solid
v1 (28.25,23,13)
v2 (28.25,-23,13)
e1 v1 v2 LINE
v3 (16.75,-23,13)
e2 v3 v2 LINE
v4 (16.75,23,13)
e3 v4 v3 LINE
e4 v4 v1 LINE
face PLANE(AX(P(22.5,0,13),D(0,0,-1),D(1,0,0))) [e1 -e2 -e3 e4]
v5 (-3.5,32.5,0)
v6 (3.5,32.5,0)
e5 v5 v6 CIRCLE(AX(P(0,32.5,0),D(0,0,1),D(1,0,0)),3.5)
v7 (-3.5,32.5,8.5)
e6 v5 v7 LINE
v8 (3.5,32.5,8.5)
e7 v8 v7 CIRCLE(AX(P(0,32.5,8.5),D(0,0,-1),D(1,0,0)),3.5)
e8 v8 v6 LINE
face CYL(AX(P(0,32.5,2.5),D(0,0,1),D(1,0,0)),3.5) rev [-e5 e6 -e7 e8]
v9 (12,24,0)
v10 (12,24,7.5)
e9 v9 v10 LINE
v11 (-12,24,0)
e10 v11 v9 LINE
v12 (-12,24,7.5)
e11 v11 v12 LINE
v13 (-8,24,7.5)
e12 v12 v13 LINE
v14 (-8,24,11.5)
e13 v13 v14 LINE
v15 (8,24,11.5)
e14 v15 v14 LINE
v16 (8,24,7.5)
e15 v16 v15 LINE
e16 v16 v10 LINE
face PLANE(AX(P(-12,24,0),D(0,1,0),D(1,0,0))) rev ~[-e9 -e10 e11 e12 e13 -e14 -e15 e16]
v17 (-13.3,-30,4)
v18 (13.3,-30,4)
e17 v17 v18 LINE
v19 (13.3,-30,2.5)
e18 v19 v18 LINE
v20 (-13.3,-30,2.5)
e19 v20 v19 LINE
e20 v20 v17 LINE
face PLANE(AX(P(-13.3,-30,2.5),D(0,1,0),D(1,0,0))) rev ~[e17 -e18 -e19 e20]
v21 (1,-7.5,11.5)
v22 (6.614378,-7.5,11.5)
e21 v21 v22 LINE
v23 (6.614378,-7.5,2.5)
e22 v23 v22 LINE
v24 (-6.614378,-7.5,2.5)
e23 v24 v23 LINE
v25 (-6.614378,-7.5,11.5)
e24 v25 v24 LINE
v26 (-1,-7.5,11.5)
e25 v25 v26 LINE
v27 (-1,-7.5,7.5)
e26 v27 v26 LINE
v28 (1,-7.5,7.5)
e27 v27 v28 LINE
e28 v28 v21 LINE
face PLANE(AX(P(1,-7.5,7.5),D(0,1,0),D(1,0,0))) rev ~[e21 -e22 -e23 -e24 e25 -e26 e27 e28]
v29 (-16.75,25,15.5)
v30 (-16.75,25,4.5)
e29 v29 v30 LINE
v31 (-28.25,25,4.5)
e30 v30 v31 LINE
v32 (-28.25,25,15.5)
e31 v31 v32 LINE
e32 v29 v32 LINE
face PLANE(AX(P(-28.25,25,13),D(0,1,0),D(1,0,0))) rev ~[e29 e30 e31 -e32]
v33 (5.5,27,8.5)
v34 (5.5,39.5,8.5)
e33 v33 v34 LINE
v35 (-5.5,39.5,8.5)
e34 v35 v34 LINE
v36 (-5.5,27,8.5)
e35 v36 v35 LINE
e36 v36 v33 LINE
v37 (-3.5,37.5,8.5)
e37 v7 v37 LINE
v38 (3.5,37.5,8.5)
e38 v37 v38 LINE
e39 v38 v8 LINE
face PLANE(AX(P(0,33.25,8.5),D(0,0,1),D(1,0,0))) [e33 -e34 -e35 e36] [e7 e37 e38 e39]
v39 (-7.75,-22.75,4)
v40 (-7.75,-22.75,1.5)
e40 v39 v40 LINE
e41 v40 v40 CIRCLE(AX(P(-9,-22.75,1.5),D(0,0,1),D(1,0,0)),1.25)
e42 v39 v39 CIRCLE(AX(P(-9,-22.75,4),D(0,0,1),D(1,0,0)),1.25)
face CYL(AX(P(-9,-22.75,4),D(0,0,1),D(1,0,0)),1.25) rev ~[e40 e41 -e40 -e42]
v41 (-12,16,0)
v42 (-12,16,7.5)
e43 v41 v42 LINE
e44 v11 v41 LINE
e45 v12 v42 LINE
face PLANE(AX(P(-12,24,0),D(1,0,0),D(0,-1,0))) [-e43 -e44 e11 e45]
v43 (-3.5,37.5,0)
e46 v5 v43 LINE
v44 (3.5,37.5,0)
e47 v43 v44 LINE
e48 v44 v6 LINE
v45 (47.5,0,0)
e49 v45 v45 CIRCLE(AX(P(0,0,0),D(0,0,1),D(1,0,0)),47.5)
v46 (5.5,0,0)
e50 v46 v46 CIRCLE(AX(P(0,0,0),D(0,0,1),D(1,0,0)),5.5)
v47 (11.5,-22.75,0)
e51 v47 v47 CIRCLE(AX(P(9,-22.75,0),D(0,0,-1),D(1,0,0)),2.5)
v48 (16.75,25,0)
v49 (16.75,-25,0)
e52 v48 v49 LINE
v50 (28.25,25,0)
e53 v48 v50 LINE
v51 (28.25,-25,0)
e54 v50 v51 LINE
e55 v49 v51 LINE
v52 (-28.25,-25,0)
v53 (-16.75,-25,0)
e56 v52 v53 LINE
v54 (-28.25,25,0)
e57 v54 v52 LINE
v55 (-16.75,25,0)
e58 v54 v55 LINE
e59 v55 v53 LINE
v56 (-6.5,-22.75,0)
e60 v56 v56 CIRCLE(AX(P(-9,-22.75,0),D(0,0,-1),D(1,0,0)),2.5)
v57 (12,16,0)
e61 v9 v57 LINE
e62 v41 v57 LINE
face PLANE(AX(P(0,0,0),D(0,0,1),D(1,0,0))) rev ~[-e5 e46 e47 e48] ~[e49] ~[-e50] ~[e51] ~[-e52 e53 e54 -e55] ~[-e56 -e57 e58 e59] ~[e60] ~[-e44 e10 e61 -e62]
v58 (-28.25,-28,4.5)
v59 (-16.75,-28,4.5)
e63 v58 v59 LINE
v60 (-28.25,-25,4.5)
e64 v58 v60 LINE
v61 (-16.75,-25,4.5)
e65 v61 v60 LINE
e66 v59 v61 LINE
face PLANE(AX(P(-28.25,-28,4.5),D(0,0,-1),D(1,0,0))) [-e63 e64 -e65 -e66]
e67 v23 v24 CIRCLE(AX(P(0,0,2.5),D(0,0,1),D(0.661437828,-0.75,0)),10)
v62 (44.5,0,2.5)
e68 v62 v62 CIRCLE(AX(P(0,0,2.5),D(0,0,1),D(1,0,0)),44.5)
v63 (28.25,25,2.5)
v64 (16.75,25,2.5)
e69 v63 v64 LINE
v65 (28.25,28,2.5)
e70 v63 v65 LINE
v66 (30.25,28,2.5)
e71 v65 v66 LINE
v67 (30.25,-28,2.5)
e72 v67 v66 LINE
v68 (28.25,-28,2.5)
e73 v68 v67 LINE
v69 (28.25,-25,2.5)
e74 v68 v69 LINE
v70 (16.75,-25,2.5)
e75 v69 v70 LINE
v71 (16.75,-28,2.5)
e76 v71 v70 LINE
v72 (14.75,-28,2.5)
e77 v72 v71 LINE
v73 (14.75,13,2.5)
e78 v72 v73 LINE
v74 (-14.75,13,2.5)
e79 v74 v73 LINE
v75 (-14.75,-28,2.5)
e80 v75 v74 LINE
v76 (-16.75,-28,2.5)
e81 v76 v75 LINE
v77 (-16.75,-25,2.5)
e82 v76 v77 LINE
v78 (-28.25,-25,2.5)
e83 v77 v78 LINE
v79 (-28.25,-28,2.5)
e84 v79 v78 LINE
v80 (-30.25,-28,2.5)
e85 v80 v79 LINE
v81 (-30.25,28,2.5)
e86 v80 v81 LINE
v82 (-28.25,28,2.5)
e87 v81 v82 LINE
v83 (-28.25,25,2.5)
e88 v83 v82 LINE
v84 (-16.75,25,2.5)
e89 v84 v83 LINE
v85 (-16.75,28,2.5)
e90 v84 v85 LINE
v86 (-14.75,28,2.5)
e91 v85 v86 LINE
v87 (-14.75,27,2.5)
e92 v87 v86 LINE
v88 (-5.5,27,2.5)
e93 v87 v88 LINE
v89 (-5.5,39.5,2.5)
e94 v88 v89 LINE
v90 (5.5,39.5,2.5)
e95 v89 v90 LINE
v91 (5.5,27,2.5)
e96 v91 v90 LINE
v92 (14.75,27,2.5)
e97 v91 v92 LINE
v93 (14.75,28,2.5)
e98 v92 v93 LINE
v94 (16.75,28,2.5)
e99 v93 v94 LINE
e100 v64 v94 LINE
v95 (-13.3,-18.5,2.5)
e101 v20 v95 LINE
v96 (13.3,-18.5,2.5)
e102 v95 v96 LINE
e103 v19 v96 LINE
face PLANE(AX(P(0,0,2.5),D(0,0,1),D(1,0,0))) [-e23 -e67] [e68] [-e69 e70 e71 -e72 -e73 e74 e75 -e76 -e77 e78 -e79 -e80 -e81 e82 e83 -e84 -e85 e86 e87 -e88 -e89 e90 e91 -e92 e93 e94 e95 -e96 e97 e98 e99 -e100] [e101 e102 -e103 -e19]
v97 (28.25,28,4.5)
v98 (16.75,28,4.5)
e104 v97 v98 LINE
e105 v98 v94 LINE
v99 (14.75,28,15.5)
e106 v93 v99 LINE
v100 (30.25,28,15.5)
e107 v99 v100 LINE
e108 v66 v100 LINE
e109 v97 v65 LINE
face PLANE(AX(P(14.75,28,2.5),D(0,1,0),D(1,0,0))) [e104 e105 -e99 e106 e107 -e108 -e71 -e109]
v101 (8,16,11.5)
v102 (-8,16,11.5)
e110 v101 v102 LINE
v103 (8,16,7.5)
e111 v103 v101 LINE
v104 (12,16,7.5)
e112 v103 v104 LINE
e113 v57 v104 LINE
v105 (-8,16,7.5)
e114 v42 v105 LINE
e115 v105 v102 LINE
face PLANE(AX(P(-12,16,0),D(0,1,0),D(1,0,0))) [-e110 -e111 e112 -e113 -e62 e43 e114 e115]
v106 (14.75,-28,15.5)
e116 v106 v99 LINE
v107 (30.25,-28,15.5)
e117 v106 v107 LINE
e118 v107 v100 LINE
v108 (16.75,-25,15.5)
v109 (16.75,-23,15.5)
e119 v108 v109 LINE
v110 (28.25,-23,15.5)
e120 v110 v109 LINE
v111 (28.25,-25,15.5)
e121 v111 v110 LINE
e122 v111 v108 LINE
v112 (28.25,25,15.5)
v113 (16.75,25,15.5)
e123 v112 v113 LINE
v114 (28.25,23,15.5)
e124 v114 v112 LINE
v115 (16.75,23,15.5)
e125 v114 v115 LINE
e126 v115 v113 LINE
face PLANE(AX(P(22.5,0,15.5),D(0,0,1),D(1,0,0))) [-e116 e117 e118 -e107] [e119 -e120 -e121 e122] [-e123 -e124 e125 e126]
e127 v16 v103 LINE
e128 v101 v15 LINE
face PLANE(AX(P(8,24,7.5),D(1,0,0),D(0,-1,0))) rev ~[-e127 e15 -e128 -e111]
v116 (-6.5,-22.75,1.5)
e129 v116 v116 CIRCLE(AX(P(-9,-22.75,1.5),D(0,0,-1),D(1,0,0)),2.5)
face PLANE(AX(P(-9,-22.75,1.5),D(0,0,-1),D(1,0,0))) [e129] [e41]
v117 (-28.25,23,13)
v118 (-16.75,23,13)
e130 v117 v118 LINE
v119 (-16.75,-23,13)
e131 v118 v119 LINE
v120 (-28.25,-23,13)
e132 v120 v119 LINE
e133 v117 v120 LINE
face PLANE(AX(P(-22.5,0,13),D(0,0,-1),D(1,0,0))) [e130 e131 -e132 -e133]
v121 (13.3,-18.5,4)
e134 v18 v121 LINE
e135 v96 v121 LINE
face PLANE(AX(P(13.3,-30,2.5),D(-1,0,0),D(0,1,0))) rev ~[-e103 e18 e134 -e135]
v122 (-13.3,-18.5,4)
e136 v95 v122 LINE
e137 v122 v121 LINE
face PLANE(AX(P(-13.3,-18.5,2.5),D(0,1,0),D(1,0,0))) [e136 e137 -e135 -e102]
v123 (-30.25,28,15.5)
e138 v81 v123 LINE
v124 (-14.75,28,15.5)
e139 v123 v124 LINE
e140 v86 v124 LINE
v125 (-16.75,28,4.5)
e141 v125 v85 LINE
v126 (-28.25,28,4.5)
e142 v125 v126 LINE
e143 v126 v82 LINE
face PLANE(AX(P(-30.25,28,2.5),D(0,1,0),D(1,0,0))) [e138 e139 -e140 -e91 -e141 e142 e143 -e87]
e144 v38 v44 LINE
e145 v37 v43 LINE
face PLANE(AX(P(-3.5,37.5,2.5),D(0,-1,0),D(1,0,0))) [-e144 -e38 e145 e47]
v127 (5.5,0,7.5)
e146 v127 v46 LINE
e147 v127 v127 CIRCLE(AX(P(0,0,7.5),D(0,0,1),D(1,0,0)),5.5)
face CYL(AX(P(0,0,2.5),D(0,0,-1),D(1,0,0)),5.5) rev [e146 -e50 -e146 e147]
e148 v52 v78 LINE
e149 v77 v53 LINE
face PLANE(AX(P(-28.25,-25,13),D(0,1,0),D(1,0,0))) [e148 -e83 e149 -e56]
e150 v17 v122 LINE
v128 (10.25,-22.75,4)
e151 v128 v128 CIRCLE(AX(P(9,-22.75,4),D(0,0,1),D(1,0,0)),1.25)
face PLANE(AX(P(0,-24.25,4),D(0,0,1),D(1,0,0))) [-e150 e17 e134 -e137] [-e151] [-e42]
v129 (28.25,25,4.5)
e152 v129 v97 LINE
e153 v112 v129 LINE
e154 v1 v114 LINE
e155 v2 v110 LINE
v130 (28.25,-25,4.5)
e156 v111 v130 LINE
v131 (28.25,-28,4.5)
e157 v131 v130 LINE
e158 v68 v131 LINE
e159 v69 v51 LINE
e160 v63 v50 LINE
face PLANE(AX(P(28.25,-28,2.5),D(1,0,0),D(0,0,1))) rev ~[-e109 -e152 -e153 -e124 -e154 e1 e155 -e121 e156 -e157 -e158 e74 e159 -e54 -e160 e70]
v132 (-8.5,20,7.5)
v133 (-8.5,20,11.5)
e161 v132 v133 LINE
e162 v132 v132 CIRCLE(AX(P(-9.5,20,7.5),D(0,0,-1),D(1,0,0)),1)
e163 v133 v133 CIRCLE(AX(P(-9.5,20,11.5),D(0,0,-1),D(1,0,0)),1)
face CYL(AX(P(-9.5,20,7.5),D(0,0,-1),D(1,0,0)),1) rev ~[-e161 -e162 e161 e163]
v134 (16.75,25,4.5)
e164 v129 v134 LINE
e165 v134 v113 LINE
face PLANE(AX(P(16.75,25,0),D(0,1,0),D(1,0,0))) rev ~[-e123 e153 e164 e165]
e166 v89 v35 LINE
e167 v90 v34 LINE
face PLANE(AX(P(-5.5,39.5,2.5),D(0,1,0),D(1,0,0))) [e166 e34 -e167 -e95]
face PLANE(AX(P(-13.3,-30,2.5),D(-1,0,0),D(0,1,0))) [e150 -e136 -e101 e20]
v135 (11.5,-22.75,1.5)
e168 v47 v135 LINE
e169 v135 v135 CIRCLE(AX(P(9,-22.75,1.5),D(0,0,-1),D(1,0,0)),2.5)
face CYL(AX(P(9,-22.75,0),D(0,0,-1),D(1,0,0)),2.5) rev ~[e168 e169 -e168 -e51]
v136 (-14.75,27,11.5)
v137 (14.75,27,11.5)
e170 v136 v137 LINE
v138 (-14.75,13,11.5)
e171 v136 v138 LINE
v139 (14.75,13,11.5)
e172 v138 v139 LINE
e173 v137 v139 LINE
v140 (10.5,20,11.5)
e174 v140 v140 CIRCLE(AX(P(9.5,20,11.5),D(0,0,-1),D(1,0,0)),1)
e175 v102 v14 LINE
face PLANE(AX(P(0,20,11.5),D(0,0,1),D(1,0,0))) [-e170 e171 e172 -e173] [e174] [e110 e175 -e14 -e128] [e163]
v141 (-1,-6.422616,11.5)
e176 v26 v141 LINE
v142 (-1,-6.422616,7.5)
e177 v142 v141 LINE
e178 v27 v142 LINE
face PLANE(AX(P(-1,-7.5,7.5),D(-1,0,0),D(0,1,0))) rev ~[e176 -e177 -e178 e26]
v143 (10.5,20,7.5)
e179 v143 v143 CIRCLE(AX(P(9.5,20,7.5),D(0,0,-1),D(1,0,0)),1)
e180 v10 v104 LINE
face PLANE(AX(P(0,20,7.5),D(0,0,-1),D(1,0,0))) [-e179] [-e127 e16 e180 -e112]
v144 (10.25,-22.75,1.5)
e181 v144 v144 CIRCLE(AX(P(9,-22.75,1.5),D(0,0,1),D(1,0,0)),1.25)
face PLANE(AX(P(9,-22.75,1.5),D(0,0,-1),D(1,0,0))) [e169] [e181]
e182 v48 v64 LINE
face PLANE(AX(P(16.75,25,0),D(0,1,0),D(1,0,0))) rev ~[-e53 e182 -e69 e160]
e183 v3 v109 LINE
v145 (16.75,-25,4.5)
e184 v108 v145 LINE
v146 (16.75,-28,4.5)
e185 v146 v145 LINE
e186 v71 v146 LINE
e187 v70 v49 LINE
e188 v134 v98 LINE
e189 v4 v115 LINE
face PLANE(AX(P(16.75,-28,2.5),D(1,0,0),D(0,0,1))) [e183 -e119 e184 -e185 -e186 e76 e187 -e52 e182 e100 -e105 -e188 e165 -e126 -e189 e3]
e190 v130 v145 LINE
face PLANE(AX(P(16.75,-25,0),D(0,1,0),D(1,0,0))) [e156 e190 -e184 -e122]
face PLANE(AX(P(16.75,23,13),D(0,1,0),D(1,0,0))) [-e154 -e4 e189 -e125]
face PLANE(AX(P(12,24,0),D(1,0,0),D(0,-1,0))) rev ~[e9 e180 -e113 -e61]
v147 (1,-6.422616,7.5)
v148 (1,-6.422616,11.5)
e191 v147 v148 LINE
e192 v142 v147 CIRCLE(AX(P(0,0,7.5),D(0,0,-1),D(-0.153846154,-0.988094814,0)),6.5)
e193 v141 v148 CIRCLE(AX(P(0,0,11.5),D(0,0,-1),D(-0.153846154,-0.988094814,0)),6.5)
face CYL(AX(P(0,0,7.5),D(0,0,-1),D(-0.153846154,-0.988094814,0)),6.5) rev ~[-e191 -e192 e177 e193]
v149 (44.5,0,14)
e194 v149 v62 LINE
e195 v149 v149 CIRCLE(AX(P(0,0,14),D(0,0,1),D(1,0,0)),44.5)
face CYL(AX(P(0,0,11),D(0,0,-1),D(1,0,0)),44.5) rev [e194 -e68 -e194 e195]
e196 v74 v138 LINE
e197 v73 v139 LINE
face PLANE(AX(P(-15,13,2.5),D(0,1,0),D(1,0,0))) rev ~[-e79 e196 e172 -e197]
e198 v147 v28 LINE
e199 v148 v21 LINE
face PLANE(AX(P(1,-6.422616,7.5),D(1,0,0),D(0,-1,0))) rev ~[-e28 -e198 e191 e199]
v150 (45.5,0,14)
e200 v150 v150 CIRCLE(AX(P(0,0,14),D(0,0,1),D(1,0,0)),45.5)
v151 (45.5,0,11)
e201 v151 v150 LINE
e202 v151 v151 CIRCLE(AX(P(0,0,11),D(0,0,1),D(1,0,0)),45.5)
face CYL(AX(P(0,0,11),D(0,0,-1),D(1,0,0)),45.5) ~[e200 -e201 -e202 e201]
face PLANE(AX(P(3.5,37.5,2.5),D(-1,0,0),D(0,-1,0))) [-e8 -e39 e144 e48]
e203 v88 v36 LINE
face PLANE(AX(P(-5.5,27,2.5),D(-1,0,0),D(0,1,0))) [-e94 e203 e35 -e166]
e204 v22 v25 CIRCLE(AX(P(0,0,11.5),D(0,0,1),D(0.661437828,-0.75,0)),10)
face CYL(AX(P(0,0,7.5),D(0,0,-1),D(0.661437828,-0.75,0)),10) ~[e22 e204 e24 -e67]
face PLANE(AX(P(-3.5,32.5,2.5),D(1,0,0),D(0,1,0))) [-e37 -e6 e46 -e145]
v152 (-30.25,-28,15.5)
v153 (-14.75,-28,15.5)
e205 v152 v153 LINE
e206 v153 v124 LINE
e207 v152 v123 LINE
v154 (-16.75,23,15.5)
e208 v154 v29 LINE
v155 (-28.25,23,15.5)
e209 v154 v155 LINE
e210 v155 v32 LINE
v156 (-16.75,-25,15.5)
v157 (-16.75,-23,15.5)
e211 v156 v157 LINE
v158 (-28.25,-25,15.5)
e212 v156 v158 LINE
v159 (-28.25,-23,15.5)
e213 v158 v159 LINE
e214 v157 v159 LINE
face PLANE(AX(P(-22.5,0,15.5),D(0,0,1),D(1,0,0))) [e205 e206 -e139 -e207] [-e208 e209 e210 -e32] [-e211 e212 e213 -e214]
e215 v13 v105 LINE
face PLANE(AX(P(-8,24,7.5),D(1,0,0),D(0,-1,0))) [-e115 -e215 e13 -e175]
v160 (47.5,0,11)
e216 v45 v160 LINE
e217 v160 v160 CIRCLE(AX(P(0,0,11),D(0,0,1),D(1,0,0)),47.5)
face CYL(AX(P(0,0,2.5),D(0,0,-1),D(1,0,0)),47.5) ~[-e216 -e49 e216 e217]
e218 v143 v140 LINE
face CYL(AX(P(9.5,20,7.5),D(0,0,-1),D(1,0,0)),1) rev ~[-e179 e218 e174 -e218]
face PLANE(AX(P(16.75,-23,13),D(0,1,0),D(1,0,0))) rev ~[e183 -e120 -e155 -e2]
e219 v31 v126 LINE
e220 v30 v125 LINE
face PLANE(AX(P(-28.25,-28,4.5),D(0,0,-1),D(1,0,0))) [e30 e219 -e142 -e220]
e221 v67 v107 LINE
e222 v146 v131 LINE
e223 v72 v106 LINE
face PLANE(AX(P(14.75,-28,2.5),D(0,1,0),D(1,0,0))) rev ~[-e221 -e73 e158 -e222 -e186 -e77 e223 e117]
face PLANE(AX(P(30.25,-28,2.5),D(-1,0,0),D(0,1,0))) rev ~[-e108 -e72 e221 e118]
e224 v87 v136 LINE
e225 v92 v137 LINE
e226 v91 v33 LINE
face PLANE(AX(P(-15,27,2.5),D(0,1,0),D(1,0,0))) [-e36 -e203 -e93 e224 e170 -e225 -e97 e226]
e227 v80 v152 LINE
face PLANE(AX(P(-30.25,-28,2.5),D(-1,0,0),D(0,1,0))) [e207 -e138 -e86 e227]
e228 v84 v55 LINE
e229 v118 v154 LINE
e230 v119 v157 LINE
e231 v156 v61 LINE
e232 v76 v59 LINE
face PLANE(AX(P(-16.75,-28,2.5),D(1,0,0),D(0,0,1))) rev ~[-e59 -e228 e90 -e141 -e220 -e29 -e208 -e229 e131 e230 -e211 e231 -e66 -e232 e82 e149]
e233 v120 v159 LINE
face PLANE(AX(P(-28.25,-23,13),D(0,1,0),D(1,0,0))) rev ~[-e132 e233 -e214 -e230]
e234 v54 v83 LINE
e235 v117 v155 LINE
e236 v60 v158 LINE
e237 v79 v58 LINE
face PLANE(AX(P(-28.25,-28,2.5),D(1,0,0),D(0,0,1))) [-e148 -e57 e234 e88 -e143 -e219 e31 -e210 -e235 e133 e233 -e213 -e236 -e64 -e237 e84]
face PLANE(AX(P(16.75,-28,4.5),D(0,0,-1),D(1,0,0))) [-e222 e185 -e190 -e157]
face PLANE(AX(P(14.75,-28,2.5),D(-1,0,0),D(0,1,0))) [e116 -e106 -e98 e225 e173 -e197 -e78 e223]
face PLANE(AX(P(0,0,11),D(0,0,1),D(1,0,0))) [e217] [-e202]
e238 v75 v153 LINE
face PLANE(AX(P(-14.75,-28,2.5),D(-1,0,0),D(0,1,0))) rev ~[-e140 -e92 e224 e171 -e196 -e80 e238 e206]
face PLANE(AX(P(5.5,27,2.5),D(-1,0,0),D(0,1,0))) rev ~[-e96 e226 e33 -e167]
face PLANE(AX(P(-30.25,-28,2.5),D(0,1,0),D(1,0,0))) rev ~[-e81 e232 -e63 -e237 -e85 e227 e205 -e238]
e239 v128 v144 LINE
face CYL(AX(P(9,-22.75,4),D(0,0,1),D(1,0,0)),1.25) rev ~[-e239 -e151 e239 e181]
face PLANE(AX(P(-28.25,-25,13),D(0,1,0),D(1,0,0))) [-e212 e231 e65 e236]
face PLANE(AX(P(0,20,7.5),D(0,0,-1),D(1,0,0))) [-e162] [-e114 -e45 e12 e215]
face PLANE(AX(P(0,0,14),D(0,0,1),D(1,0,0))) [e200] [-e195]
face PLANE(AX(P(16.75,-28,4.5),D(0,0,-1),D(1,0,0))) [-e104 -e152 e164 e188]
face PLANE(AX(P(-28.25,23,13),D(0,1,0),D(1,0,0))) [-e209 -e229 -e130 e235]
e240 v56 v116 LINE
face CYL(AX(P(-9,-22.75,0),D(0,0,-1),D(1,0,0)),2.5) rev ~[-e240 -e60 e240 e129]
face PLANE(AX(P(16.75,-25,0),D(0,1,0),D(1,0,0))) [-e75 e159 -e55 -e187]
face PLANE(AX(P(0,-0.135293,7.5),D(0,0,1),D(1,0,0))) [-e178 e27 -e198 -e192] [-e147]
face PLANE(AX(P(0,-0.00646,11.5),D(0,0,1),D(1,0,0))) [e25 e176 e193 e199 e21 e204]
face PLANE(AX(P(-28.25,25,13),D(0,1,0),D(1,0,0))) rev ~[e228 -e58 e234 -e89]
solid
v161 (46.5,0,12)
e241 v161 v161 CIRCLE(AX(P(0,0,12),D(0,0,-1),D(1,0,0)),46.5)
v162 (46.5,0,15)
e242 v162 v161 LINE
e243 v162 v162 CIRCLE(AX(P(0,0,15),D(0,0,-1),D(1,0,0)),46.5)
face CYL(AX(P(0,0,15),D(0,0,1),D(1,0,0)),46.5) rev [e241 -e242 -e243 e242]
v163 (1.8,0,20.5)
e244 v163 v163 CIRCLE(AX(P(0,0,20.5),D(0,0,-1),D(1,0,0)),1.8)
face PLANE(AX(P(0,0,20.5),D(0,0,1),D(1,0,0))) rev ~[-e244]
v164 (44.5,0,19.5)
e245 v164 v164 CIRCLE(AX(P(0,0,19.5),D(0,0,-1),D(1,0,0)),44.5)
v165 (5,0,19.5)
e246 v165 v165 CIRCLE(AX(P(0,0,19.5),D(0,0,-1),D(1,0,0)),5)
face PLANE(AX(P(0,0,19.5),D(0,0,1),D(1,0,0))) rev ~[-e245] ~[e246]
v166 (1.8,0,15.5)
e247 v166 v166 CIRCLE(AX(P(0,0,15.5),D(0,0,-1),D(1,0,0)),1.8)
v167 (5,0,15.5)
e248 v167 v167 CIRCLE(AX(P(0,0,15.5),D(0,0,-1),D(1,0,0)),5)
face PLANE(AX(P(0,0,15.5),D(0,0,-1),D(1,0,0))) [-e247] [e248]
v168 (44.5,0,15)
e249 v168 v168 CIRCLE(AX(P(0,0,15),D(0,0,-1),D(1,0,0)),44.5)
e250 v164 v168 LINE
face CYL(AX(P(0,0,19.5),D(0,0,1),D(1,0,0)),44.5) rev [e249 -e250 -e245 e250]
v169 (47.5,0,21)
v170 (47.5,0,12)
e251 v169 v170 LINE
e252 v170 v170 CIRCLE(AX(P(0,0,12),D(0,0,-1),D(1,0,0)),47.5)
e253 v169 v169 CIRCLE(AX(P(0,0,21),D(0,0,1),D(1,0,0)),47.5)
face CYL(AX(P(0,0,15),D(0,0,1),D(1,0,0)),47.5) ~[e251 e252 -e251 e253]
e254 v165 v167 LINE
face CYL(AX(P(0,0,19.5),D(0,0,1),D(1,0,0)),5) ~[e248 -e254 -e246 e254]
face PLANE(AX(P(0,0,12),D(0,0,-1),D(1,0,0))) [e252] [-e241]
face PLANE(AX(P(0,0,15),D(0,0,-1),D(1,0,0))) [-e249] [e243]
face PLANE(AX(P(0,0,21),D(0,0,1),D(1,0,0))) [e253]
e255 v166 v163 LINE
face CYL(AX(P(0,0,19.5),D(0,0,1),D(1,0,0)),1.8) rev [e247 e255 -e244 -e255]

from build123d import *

# Parameters (mm, degrees)
F0_R      = 47.5
F0_R_2    = 5.5
F1_DEPTH  = 2.5
F2_W      = 26.6
F2_H      = 11.5
F3_DEPTH  = 1.5
F4_R      = 1.25
F5_DEPTH  = 4.001
F6_R      = 5.5
F7_DEPTH  = 5
F9_DEPTH  = 4
F11_W     = 30
F11_H     = 14
F12_DEPTH = 9
F10_W     = 24
F10_H     = 8
F13_DEPTH = 7.5
F14_W     = 16
F14_H     = 8
F14_R     = 1
F15_DEPTH = 4.001
F17_W     = 15.5
F17_H     = 56
F18_DEPTH = 13
F16_W     = 11.5
F16_H     = 50
F19_DEPTH = 13
F21_W     = 11.5
F21_H     = 2
F20_W     = 11.5
F20_H     = 2
F22_DEPTH = 2.501
F23_W     = 11.5
F23_H     = 2
F24_DEPTH = 75.501
F25_W     = 11.5
F25_H     = 2
F26_DEPTH = 75.501
F27_W     = 11
F27_H     = 12.5
F28_DEPTH = 6
F29_DEPTH = 2.501
F30_R     = 47.5
F30_R_2   = 44.5
F31_DEPTH = 8.5
F32_R     = 45.5
F32_R_2   = 44.5
F33_DEPTH = 3
F34_R     = 2.5
F34_R_2   = 1.25
F35_DEPTH = 1.5
F37_R     = 47.5
F38_DEPTH = 1.5
F39_R     = 47.5
F39_R_2   = 44.5
F40_DEPTH = 4.5
F41_R     = 47.5
F41_R_2   = 46.5
F42_DEPTH = 3
F43_R     = 5
F43_R_2   = 1.8
F44_DEPTH = 4
F45_DEPTH = 1


with BuildPart() as f1:
    # F0 (on Top) → F1 (new body)
    with BuildSketch(Plane.XY):
        Circle(F0_R)
        Circle(F0_R_2, mode=Mode.SUBTRACT)
    extrude(amount=F1_DEPTH)

    # F2 (on face) → F3 (join)
    with BuildSketch(Plane.XY.offset(2.5)):
        with Locations((0, -24.25)):
            Rectangle(F2_W, F2_H)
    extrude(amount=F3_DEPTH)

    # F4 (on face) → F5 (cut, through all)
    with BuildSketch(Plane.XY.offset(4)):
        with Locations((-9, -22.75)):
            Circle(F4_R)
        with Locations((9, -22.75)):
            Circle(F4_R)
    extrude(amount=-F5_DEPTH, mode=Mode.SUBTRACT)

    # F6 (on face) → F7 (join)
    with BuildSketch(Plane.XY.offset(2.5)):
        with BuildLine():
            Line((-6.6143782777, -7.5), (6.6143782777, -7.5))
            ThreePointArc((6.6143782777, -7.5), (0, 10), (-6.6143782777, -7.5))
        make_face()
        Circle(F6_R, mode=Mode.SUBTRACT)
    extrude(amount=F7_DEPTH)

    # F8 (on face) → F9 (join)
    with BuildSketch(Plane.XY.offset(7.5)):
        with BuildLine():
            Line((1, -7.5), (6.6143782777, -7.5))
            ThreePointArc((6.6143782777, -7.5), (0, 10), (-6.6143782777, -7.5))
            Line((-6.6143782777, -7.5), (-1, -7.5))
            Line((-1, -7.5), (-1, -6.4226162893))
            ThreePointArc((-1, -6.4226162893), (0, 6.5), (1, -6.4226162893))
            Line((1, -6.4226162893), (1, -7.5))
        make_face()
    extrude(amount=F9_DEPTH)

    # F11 (on face) → F12 (join)
    with BuildSketch(Plane.XY.offset(2.5)):
        with Locations((0, 20)):
            Rectangle(F11_W, F11_H)
    extrude(amount=F12_DEPTH)

    # F10 (on face) → F13 (cut)
    with BuildSketch(Plane(origin=(0, 0, 0), x_dir=(1, 0, 0), z_dir=(0, 0, -1))):
        with Locations((0, -20)):
            Rectangle(F10_W, F10_H)
    extrude(amount=-F13_DEPTH, mode=Mode.SUBTRACT)

    # F14 (on face) → F15 (cut, through all)
    with BuildSketch(Plane(origin=(0, 0, 7.5), x_dir=(1, 0, 0), z_dir=(0, 0, -1))):
        with Locations((0, -20)):
            Rectangle(F14_W, F14_H)
        with Locations((-9.5, -20)):
            Circle(F14_R)
        with Locations((9.5, -20)):
            Circle(F14_R)
    extrude(amount=-F15_DEPTH, mode=Mode.SUBTRACT)

    # F17 (on face) → F18 (join)
    with BuildSketch(Plane.XY.offset(2.5)):
        with Locations((-22.5, 0)):
            Rectangle(F17_W, F17_H)
        with Locations((22.5, 0)):
            Rectangle(F17_W, F17_H)
    extrude(amount=F18_DEPTH)

    # F16 (on face) → F19 (cut)
    with BuildSketch(Plane(origin=(0, 0, 0), x_dir=(1, 0, 0), z_dir=(0, 0, -1))):
        with Locations((-22.5, 0)):
            Rectangle(F16_W, F16_H)
        with Locations((22.5, 0)):
            Rectangle(F16_W, F16_H)
    extrude(amount=-F19_DEPTH, mode=Mode.SUBTRACT)

    # F21 (on face) + F20 (on face) → F22 (cut, through all)
    with BuildSketch(Plane(origin=(0, 0, 13), x_dir=(1, 0, 0), z_dir=(0, 0, -1))):
        with Locations((-22.5, 24)):
            Rectangle(F21_W, F21_H)
        with Locations((-22.5, -24)):
            Rectangle(F21_W, F21_H)
    with BuildSketch(Plane(origin=(0, 0, 13), x_dir=(1, 0, 0), z_dir=(0, 0, -1))):
        with Locations((22.5, -24)):
            Rectangle(F20_W, F20_H)
        with Locations((22.5, 24)):
            Rectangle(F20_W, F20_H)
    extrude(amount=-F22_DEPTH, mode=Mode.SUBTRACT)

    # F23 (on face) → F24 (cut, through all)
    with BuildSketch(Plane.XZ.offset(28)):
        with Locations((22.5, 3.5)):
            Rectangle(F23_W, F23_H)
    extrude(amount=-F24_DEPTH, mode=Mode.SUBTRACT)

    # F25 (on face) → F26 (cut, through all)
    with BuildSketch(Plane.XZ.offset(28)):
        with Locations((-22.5, 3.5)):
            Rectangle(F25_W, F25_H)
    extrude(amount=-F26_DEPTH, mode=Mode.SUBTRACT)

    # F27 (on face) → F28 (join)
    with BuildSketch(Plane.XY.offset(2.5)):
        with Locations((0, 33.25)):
            Rectangle(F27_W, F27_H)
        with BuildLine():
            Line((-3.5, 32.5), (-3.5, 37.5))
            Line((-3.5, 37.5), (3.5, 37.5))
            Line((3.5, 37.5), (3.5, 32.5))
            ThreePointArc((3.5, 32.5), (0, 29), (-3.5, 32.5))
        make_face(mode=Mode.SUBTRACT)
    extrude(amount=F28_DEPTH)

    # F29 (cut, through all): a face of the model
    f29_faces = [f1.faces().sort_by_distance(p)[0] for p in [
        (0, 33.5861765733, 2.5),
    ]]
    extrude(f29_faces, amount=-F29_DEPTH, mode=Mode.SUBTRACT)

    # F30 (on face) → F31 (join)
    with BuildSketch(Plane.XY.offset(2.5)):
        Circle(F30_R)
        Circle(F30_R_2, mode=Mode.SUBTRACT)
    extrude(amount=F31_DEPTH)

    # F32 (on face) → F33 (join)
    with BuildSketch(Plane.XY.offset(11)):
        Circle(F32_R)
        Circle(F32_R_2, mode=Mode.SUBTRACT)
    extrude(amount=F33_DEPTH)

    # F34 (on face) → F35 (cut)
    with BuildSketch(Plane(origin=(0, 0, 0), x_dir=(1, 0, 0), z_dir=(0, 0, -1))):
        with Locations((-9, 22.75)):
            Circle(F34_R)
        with Locations((-9, 22.75)):
            Circle(F34_R_2, mode=Mode.SUBTRACT)
        with Locations((9, 22.75)):
            Circle(F34_R)
        with Locations((9, 22.75)):
            Circle(F34_R_2, mode=Mode.SUBTRACT)
        with Locations((9, 22.75)):
            Circle(F34_R_2)
        with Locations((-9, 22.75)):
            Circle(F34_R_2)
    extrude(amount=-F35_DEPTH, mode=Mode.SUBTRACT)


with BuildPart() as f38:
    # F37 (on offset) → F38 (new body)
    with BuildSketch(Plane.XY.offset(21)):
        Circle(F37_R)
    extrude(amount=-F38_DEPTH)

    # F39 (on face) → F40 (join)
    with BuildSketch(Plane(origin=(0, 0, 19.5), x_dir=(1, 0, 0), z_dir=(0, 0, -1))):
        Circle(F39_R)
        Circle(F39_R_2, mode=Mode.SUBTRACT)
    extrude(amount=F40_DEPTH)

    # F41 (on face) → F42 (join)
    with BuildSketch(Plane(origin=(0, 0, 15), x_dir=(1, 0, 0), z_dir=(0, 0, -1))):
        Circle(F41_R)
        Circle(F41_R_2, mode=Mode.SUBTRACT)
    extrude(amount=F42_DEPTH)

    # F43 (on face) → F44 (join)
    with BuildSketch(Plane(origin=(0, 0, 19.5), x_dir=(1, 0, 0), z_dir=(0, 0, -1))):
        Circle(F43_R)
        Circle(F43_R_2, mode=Mode.SUBTRACT)
    extrude(amount=F44_DEPTH)

    # F45 (cut): a face of the model
    f45_faces = [f38.faces().sort_by_distance(p)[0] for p in [
        (0, 0, 19.5),
    ]]
    extrude(f45_faces, amount=-F45_DEPTH, mode=Mode.SUBTRACT)


solid = Compound([f1.part, f38.part])
